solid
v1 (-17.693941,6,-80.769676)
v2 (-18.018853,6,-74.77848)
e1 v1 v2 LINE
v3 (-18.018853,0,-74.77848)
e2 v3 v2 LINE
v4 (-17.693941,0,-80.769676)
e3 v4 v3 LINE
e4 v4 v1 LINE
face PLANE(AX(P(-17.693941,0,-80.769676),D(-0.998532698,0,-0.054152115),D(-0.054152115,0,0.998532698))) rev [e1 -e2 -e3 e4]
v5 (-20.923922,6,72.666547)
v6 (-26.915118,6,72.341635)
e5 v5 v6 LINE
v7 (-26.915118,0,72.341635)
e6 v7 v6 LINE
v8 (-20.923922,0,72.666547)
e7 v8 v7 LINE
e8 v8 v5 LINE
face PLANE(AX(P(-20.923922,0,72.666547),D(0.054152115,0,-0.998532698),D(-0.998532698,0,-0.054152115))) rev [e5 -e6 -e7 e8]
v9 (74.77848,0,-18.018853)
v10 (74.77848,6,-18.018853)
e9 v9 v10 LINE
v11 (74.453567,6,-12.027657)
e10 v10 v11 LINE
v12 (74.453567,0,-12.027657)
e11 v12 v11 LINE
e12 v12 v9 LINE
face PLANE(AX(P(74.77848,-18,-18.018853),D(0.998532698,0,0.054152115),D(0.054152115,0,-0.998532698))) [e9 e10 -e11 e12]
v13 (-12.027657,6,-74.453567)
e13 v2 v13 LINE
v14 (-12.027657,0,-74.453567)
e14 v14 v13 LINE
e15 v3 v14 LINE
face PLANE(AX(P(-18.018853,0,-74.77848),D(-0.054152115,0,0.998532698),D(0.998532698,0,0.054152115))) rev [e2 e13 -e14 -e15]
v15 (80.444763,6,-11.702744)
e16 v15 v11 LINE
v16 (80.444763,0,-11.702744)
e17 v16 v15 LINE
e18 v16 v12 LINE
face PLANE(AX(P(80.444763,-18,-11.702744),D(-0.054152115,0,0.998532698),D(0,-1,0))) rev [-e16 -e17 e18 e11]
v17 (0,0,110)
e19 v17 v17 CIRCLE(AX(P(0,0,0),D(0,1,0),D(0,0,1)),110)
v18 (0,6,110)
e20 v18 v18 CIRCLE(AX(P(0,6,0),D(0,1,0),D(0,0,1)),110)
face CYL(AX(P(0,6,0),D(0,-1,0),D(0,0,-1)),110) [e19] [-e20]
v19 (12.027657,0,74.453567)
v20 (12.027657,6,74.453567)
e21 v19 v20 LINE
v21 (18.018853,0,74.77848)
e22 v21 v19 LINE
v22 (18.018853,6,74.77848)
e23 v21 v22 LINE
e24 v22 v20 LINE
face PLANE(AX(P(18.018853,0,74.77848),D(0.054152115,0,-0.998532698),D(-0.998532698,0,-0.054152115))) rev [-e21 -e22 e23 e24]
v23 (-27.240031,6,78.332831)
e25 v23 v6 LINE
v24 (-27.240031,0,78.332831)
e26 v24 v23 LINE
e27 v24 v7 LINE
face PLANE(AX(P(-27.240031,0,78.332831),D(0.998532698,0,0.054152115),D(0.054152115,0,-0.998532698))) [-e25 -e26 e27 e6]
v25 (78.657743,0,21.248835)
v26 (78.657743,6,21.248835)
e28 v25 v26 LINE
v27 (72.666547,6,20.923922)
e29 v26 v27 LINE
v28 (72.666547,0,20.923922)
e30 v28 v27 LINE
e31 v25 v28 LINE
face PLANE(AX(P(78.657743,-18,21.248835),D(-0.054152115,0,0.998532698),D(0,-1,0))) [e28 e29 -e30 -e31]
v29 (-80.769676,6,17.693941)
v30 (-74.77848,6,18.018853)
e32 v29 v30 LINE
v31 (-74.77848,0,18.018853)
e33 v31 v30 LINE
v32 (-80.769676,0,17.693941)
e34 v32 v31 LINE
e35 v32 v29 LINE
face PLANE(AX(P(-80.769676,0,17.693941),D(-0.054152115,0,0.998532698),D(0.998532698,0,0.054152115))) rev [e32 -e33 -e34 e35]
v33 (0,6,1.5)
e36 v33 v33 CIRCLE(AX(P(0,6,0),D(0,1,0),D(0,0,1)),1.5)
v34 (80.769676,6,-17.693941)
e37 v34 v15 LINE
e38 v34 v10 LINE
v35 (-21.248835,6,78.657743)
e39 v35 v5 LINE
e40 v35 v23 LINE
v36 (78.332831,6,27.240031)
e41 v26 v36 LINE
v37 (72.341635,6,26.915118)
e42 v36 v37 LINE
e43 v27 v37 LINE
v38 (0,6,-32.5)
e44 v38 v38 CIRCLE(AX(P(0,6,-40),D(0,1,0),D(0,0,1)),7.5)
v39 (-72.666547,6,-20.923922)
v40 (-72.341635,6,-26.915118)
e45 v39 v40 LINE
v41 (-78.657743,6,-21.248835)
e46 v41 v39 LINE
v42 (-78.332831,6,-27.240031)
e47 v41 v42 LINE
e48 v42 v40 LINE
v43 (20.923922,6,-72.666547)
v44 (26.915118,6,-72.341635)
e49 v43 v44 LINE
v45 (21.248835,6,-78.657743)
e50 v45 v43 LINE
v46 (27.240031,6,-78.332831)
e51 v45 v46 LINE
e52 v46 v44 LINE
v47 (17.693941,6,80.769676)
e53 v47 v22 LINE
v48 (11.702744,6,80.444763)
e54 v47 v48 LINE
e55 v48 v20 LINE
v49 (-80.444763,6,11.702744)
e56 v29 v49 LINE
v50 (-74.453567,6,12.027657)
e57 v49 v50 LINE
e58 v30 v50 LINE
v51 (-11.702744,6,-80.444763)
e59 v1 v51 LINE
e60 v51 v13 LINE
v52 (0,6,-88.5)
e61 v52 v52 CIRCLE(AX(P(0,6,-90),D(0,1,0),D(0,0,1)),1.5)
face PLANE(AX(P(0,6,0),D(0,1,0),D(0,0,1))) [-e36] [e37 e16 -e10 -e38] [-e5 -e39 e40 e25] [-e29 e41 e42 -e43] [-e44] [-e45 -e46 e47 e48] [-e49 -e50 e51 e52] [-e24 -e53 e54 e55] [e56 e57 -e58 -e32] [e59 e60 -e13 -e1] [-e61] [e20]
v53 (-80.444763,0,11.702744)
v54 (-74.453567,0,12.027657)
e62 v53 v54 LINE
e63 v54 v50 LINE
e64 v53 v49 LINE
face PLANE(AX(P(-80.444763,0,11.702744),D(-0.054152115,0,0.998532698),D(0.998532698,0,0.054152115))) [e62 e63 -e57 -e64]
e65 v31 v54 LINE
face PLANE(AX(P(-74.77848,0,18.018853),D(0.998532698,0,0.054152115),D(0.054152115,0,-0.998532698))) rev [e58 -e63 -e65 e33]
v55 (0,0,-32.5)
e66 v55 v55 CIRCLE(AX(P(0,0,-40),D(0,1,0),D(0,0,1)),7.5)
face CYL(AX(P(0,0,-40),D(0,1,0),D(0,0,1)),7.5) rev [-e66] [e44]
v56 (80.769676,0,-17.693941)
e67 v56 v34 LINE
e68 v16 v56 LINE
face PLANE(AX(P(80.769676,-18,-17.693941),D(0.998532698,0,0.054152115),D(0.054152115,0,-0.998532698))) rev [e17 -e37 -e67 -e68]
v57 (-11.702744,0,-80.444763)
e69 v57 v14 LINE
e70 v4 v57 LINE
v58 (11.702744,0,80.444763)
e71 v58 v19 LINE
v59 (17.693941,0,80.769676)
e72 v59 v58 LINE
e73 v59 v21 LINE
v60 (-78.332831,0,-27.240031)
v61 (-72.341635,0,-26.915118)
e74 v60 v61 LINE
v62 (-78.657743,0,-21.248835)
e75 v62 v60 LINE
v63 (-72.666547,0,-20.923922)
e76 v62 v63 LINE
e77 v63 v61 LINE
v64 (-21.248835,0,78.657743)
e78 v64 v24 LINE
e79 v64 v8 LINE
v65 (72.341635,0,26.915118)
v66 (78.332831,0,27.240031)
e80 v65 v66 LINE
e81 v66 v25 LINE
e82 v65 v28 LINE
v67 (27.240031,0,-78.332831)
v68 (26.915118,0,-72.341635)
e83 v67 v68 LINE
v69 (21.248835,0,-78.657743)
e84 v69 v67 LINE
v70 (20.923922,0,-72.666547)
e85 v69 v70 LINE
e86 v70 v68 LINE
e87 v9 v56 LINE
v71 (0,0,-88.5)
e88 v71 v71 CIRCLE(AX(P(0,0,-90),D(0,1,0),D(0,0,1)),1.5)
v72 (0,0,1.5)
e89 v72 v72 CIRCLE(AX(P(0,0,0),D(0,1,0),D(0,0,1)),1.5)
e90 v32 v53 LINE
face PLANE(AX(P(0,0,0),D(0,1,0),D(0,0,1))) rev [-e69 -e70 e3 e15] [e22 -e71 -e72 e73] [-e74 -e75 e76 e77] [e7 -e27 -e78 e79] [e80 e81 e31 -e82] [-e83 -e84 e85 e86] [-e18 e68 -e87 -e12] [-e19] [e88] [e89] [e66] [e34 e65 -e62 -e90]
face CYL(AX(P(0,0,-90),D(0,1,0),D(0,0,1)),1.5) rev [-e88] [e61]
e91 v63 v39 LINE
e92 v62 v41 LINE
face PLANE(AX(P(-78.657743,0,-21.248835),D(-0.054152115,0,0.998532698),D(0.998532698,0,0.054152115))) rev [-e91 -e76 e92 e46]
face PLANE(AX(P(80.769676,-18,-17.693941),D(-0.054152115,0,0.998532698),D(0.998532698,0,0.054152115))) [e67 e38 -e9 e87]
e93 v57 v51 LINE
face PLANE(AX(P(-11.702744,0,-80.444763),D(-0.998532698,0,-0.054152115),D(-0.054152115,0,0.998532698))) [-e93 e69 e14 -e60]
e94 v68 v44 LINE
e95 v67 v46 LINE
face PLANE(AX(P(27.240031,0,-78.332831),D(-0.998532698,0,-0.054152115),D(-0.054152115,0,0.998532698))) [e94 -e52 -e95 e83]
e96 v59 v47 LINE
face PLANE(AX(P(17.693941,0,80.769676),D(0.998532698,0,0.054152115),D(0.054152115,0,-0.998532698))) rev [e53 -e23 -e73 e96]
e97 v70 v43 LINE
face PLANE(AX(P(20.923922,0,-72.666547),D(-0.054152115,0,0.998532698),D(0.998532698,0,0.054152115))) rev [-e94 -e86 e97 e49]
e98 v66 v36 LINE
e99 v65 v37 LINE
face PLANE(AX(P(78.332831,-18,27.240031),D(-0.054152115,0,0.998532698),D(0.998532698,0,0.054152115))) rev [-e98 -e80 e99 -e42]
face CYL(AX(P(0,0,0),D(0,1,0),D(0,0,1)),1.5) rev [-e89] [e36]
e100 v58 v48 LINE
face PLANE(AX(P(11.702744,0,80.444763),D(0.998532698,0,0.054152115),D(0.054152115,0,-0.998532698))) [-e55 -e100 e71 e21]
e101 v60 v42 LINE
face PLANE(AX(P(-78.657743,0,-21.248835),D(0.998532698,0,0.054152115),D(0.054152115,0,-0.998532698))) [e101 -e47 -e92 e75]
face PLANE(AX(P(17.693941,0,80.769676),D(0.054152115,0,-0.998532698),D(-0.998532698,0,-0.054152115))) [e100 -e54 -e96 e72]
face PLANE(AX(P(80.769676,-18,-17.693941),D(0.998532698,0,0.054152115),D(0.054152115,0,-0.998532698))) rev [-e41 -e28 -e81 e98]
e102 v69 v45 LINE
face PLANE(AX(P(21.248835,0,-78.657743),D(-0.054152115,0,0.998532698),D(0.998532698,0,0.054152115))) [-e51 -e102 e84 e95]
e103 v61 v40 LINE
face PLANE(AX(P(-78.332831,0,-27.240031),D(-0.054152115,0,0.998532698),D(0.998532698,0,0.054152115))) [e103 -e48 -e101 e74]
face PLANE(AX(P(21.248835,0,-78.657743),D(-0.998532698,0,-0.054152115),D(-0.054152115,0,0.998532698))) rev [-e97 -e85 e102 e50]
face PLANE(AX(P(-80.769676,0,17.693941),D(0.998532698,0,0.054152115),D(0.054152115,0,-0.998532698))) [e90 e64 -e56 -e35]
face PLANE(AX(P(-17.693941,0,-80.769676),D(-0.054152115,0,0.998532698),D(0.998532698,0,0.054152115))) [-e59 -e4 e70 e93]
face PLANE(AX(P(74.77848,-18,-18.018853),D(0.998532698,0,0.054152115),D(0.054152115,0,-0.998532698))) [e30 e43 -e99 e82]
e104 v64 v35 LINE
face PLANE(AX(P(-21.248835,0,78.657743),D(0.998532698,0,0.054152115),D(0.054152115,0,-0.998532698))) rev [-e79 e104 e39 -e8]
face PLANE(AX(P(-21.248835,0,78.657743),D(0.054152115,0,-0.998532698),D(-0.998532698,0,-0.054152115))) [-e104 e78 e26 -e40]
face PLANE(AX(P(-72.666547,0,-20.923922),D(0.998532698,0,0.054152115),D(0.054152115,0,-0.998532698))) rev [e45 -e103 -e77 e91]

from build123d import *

# Parameters (mm, degrees)
SKETCH1_R           = 110
BOSS_EXTRUDE1_DEPTH = 6
SKETCH2_R           = 7.5
CUT_EXTRUDE1_DEPTH  = 156.679157243
CAVITY1_START       = 73.692998072
CAVITY1_OUTLINE_W   = 6
CAVITY1_OUTLINE_H   = 6
CAVITY1_DEPTH       = 6
CUT_EXTRUDE2_DEPTH  = 156.679157243
SKETCH6_R           = 1.5
CUT_EXTRUDE3_DEPTH  = 156.679157243


# Read off the part's stored shape, not the designer's step: Cavity1
with BuildPart() as part:
    # Sketch1 → Boss-Extrude1 (new body)
    with BuildSketch(Plane(origin=(0, 0, 0), x_dir=(1, 0, 0), z_dir=(0, 1, 0))):
        with Locations(Location((0, 0, 0), (0, 0, 270))):
            Circle(SKETCH1_R)
    extrude(amount=BOSS_EXTRUDE1_DEPTH)

    # Sketch2 → Cut-Extrude1 (cut, through all)
    with BuildSketch(Plane(origin=(0, 6, 0), x_dir=(1, 0, 0), z_dir=(0, 1, 0))):
        with Locations(Location((0, 40, 0), (0, 0, 270))):
            Circle(SKETCH2_R)
    extrude(amount=-CUT_EXTRUDE1_DEPTH, mode=Mode.SUBTRACT)

    # Cavity1 outline → Cavity1 (cut)
    with BuildSketch(Plane(origin=(0, 0, 0), x_dir=(0, 1, 0), z_dir=(0.998532697756286, 0, 0.0541521145621647)).offset(CAVITY1_START)):
        with Locations((3, -19.041827)):
            Rectangle(CAVITY1_OUTLINE_W, CAVITY1_OUTLINE_H)
        with Locations((3, 19.958173)):
            Rectangle(CAVITY1_OUTLINE_W, CAVITY1_OUTLINE_H)
    extrude(amount=CAVITY1_DEPTH, mode=Mode.SUBTRACT)

    # Sketch3 → Cut-Extrude2 (cut, through all)
    with BuildSketch(Plane(origin=(0, 6, 0), x_dir=(1, 0, 0), z_dir=(0, 1, 0))):
        Polygon((-21.248834596, -78.65774343), (-20.923921909, -72.666547244), (-26.915118096, -72.341634556), (-27.240030783, -78.332830743), align=None)
        Polygon((17.693940616, -80.769675898), (11.702744429, -80.444763211), (12.027657117, -74.453567024), (18.018853303, -74.778479712), align=None)
        Polygon((-78.65774343, 21.248834596), (-72.666547244, 20.923921909), (-72.341634556, 26.915118096), (-78.332830743, 27.240030783), align=None)
        Polygon((-80.769675898, -17.693940616), (-80.444763211, -11.702744429), (-74.453567024, -12.027657117), (-74.778479712, -18.018853303), align=None)
        Polygon((21.248834596, 78.65774343), (20.923921909, 72.666547244), (26.915118096, 72.341634556), (27.240030783, 78.332830743), align=None)
        Polygon((-17.693940616, 80.769675898), (-11.702744429, 80.444763211), (-12.027657117, 74.453567024), (-18.018853303, 74.778479712), align=None)
    extrude(amount=-CUT_EXTRUDE2_DEPTH, mode=Mode.SUBTRACT)

    # Sketch6 → Cut-Extrude3 (cut, through all)
    with BuildSketch(Plane(origin=(0, 6, 0), x_dir=(1, 0, 0), z_dir=(0, 1, 0))):
        with Locations(Location((0, 90, 0), (0, 0, 270))):
            Circle(SKETCH6_R)
        with Locations(Location((0, 0, 0), (0, 0, 270))):
            Circle(SKETCH6_R)
    extrude(amount=-CUT_EXTRUDE3_DEPTH, mode=Mode.SUBTRACT)


solid = part.part
